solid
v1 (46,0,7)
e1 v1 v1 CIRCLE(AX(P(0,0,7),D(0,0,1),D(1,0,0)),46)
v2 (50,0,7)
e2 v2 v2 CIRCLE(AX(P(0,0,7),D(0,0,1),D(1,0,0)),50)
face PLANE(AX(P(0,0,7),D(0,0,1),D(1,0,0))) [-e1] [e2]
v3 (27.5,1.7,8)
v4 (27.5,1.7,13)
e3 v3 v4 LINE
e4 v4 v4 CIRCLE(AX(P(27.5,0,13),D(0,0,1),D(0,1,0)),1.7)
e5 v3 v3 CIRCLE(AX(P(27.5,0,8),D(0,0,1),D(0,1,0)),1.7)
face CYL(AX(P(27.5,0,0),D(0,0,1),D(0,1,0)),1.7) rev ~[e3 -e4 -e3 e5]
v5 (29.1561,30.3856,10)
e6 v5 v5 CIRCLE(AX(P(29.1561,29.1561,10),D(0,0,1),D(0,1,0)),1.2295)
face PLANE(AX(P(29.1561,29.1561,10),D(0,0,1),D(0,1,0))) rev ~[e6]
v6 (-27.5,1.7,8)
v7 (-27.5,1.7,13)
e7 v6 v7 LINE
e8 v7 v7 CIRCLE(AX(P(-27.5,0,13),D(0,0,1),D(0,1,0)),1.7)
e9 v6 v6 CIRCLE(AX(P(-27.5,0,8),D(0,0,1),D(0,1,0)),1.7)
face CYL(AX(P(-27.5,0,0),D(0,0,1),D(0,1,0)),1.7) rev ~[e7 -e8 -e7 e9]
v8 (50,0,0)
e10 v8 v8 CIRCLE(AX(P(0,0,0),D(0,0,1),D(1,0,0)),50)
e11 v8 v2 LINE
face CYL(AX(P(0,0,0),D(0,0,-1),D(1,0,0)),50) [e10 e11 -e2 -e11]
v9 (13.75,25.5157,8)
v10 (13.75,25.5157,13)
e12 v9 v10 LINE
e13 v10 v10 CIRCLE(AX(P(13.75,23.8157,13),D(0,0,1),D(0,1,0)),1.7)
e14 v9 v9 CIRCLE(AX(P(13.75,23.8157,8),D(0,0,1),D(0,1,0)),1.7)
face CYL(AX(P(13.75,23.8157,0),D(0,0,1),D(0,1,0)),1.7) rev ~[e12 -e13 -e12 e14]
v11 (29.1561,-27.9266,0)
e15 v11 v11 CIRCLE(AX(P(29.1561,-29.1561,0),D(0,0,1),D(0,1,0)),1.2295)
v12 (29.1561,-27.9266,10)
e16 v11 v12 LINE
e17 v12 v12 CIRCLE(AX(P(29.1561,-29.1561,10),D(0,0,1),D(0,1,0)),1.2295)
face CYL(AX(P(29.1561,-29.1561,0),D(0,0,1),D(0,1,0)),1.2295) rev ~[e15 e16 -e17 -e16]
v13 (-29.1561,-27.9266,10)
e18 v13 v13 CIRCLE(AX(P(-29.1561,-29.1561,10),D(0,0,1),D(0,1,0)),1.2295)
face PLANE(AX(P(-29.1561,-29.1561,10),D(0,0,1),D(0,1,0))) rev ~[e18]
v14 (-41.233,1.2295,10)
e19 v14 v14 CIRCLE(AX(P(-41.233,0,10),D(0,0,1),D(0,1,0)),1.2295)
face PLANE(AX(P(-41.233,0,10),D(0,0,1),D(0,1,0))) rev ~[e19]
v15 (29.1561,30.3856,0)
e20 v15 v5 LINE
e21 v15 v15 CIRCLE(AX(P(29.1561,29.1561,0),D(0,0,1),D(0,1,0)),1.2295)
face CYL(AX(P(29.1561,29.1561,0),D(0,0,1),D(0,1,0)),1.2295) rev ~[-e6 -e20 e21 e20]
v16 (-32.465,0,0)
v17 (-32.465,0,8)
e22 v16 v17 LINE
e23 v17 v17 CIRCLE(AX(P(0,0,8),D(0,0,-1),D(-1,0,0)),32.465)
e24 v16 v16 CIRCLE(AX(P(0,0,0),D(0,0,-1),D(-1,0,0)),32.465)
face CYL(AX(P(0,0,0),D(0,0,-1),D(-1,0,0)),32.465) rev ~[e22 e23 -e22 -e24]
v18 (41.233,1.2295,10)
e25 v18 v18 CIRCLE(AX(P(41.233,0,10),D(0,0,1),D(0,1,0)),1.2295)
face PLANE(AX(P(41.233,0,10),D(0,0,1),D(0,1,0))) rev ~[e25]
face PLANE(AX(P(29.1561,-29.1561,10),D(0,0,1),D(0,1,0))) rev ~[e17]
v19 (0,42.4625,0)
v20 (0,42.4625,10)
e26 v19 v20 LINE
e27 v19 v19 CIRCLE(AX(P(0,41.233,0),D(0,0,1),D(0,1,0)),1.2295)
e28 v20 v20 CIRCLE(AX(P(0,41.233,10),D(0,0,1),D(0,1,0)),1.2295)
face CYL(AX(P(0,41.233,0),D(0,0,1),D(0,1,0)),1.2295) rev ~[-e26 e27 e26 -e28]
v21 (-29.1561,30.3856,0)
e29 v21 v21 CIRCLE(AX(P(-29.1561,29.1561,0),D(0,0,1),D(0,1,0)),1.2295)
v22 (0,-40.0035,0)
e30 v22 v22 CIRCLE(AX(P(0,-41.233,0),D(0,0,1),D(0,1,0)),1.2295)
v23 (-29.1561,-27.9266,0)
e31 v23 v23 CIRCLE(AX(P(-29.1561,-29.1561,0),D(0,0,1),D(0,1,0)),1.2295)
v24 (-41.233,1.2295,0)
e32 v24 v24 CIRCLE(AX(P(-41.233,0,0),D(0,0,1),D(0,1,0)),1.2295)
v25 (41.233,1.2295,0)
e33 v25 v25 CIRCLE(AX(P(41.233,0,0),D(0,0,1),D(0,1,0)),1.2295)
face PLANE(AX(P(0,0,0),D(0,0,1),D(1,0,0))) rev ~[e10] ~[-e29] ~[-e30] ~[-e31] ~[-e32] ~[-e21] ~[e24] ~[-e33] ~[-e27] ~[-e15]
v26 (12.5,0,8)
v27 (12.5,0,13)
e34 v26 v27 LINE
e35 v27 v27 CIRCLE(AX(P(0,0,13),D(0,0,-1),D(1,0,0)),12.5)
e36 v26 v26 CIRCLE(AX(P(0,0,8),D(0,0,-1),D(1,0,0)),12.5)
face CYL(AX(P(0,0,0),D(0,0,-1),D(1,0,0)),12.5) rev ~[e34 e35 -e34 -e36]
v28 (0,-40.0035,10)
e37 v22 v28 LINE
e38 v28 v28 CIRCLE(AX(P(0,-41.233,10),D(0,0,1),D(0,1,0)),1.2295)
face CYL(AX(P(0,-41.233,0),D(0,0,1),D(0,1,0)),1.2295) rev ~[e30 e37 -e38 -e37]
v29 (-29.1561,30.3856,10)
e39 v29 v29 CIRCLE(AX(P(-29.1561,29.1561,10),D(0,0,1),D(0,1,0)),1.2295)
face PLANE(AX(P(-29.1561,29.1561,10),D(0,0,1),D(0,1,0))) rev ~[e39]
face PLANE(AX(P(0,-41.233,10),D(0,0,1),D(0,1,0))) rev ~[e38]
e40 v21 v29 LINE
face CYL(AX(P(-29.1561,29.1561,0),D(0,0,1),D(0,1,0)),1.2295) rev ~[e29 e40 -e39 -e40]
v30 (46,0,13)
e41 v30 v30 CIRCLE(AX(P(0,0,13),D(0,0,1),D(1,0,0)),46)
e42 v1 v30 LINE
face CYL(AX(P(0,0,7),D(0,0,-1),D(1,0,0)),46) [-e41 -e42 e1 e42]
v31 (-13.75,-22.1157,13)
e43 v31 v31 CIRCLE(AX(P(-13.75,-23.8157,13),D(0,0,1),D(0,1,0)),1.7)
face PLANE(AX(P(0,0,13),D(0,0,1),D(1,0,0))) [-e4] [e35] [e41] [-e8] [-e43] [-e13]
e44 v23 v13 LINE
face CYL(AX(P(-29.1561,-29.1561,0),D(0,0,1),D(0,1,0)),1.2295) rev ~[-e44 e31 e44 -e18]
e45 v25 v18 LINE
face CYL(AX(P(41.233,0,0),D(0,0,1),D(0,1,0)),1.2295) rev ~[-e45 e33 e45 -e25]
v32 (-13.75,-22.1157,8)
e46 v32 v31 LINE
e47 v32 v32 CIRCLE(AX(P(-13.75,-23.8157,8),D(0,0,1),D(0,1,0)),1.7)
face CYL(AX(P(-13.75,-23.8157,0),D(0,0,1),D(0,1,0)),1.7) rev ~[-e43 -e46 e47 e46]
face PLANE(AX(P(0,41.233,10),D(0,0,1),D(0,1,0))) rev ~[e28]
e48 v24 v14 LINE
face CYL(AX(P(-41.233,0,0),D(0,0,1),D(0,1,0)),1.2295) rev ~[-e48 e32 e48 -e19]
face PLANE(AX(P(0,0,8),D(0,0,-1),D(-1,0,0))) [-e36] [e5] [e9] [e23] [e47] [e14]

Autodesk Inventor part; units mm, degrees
ref_plane "YZ Plane" through (0, 0, 0) normal (1, 0, 0) x (0, 1, 0)
sketch "Sketch1" plane through (0, 0, 0) normal (0, 0, 1) x (1, 0, 0)
  circle A0 centre (0, 0) radius 50
  circle A1 centre (0, 0) radius 12.5
  circle A2 centre (0, 0) radius 14.5
  line L0 (-15.5, -15.5) -> (15.5, -15.5) construction
  line L1 (15.5, -15.5) -> (15.5, 15.5) construction
  line L2 (15.5, 15.5) -> (-15.5, 15.5) construction
  line L3 (-15.5, 15.5) -> (-15.5, -15.5) construction
  line L4 (-15.5, -15.5) -> (15.5, 15.5) construction
  line L5 (15.5, -15.5) -> (-15.5, 15.5) construction
  dimension "Diametro" = 100
  dimension "d1" = 25
  dimension "d2" = 2
  dimension "d8" = 31
extrude "Extrusion1" add sketch "Sketch1" along normal blind 7 contours A0 | A2
extrude "Extrusion2" add sketch "Sketch1" along normal blind 100 contours A2
ref_plane "Work Plane1" through (0, 0, 22) normal (0, 0, 1) x (1, 0, 0)
sketch "Sketch2" plane through (0, 0, 22) normal (0, 0, 1) x (1, 0, 0)
  arc A0 (2.5, 24.8747) -> (-2.5, 24.8747) centre (0, 0) ccw
  line L0 (2.5, 24.8747) -> (2.5, 14.2829)
  line L1 (-2.5, 24.8747) -> (-2.5, 14.2829)
  line L2 (0, -70) -> (0, 70) projected
  circle A1 centre (0, 0) radius 14.5 projected
  point P0 (0, 25)
  dimension "d24" = 5
  dimension "d25" = 25
  dimension "Dedos" = 5
extrude "Extrusion3" add sketch "Sketch2" along normal blind 15 contours L0 A1 L2 A0 | L2 A1 L1 A0
sketch "Sketch3" plane through (0, 0, 0) normal (1, 0, 0) x (0, 1, 0)
  line L0 (25, 37) -> (24.8747, 37) projected
  line L1 (14.2829, 22) -> (14.5, 22) projected
  line L2 (25, 22) -> (25, 37) projected
  line L3 (14.2829, 22) -> (14.2829, 37) projected
  circle A0 centre (25.74, 29.5) radius 1.5
  line L4 (0, -7.4) -> (0, 44.4) projected
  point P0 (0, 0)
  point P1 (25, 29.5)
  dimension "d31" = 3
  dimension "d92" = 25.74
fillet "Fillet2" radius 8 1 edges at (0, 25, 22)
pattern_circular "Circular Pattern1" count 4 over 360 about axis through (0, 0, 0) along (0, 0, 1) of "Fillet2", "Extrusion3"
ref_plane "Plano de trabajo2" through (0, 0, 54) normal (0, 0, 1) x (1, 0, 0)
sketch "Boceto4" plane through (0, 0, 54) normal (0, 0, 1) x (1, 0, 0)
  circle A0 centre (0, 0) radius 17.5
  circle A1 centre (0, 0) radius 14.5 projected
  line L0 (4, -23.75) -> (4, -26.75) projected
  dimension "d54" = 35
extrude "Extrusión5" add sketch "Boceto4" against normal up to surface (47 mm away)
sketch "Boceto5" plane through (0, 0, 37) normal (0, 0, 1) x (0, 1, 0)
  arc A0 (-2.5, -17.3205) -> (2.5, -17.3205) centre (0, 0) ccw projected
  line L0 (-2.5, -17.3205) -> (-2.5, -24.8747) projected
  arc A1 (-2.5, -24.8747) -> (2.5, -24.8747) centre (0, 0) ccw projected
  line L1 (2.5, -24.8747) -> (2.5, -17.3205) projected
  circle A2 centre (0, 0) radius 14.5 projected
  line L2 (2.5, -17.3205) -> (2.5, -14.2829)
  line L3 (-2.5, -17.3205) -> (-2.5, -14.2829)
extrude "Extrusión6" add sketch "Boceto5" along normal blind 20 contours L3 A2 L2 A0 | A0 L1 A1 L0
fillet "Empalme4" radius 8 1 edges at (25, 0, 57)
pattern_circular "Patrón circular2" count 4 over 360 about axis through (0, 0, 54) along (0, 0, -1) of "Extrusión6", "Empalme4"
chamfer "Chaflán1" distance 2 angle 45 1 edges at (-14.5, 0, 100)
sketch "Boceto6" plane through (0, 0, 7) normal (0, 0, 1) x (1, 0, 0)
  circle A0 centre (0, 0) radius 50 projected
  arc A1 (17.3205, 2.5) -> (2.5, 17.3205) centre (0, 0) ccw construction
  line L0 (0, 0) -> (32.476, 18.75) construction
  arc A2 (17.3205, 2.5) -> (2.5, 17.3205) centre (0, 0) ccw construction
  point P0 (16.25, -6.4952)
  point P1 (16.25, 6.4952)
  point P2 (0, 37.5)
  point P3 (-32.476, 18.75)
  point P4 (-32.476, -18.75)
  point P5 (0, -37.5)
  point P6 (32.476, -18.75)
  point P7 (10.8253, 13.75)
  point P8 (15.1554, 8.75)
  dimension "d73" = 360
  dimension "d91" = 37.5
sketch "Boceto8" plane through (0, 0, 7) normal (0, 0, 1) x (1, 0, 0)
  circle A0 centre (0, 0) radius 17.5 projected
  circle A1 centre (0, 0) radius 50 projected
  circle A2 centre (0, 0) radius 46
  dimension "Espesor" = 4
extrude "Extrusión8" add sketch "Boceto8" along normal blind 6 contours A2
sketch "Boceto9" plane through (2.5, 14.0104, 54) normal (1, 0, 0) x (0, -1, 0)
  line L0 (16.5104, 0) -> (28.2932, 0) projected
  line L1 (-35.9896, 54) -> (64.0104, 54) projected
  point P0 (1.4018, 24.5)
  point P1 (22.4018, 0)
  dimension "d124" = 21
  dimension "d125" = 29.5
hole "Agujero4" at (2.5, 12.6086, 29.5) direction (-1, 0, 0) diameter 3.4 depth 5 clearance for "Tornillo de cabeza plana avellanada ISO 2009/7046" size "M3" standard "ISO"
pattern_circular "Patrón circular3" count 4 over 360 about axis through (0, 0, 54) along (0, 0, -1) of "Agujero4"
sketch "Boceto13" plane through (0, 0, 13) normal (0, 0, 1) x (1, 0, 0)
  point P0 (0, 0)
sketch "Boceto15" plane through (0, 0, 0) normal (0, 0, -1) x (-1, 0, 0)
  circle A0 centre (0, 0) radius 27.5 construction
  point P0 (27.5, 0)
  point P1 (13.75, 23.8157)
  point P2 (-13.75, 23.8157)
  point P3 (-27.5, 0)
  point P4 (-13.75, -23.8157)
  point P5 (13.75, -23.8157)
  dimension "d134" = 55
  dimension "d137" = 360
hole "Agujero8" at (-13.75, -23.8157, 0) at (13.75, -23.8157, 0) at (27.5, 0, 0) at (13.75, 23.8157, 0) at (-13.75, 23.8157, 0) at (-27.5, 0, 0) direction (0, 0, 1) diameter 3.4 end through all clearance for "Tornillo de cabeza cilíndrica ranurada ISO 1207" size "M3" standard "ISO"
sketch "Boceto16" plane through (0, 0, 0) normal (0, 0, -1) x (-1, 0, 0)
  circle A0 centre (0, 0) radius 32.465
  dimension "d146" = 64.93
extrude "Extrusión10" cut sketch "Boceto16" against normal blind 8
sketch "Boceto18" plane through (0, 0, 0) normal (0, 0, -1) x (-1, 0, 0)
  point P0 (0, 0)
  point P1 (-41.233, 0)
  point P2 (-29.1561, -29.1561)
  point P3 (0, -41.233)
  point P4 (29.1561, -29.1561)
  point P5 (41.233, 0)
  point P6 (29.1561, 29.1561)
  point P7 (0, 41.233)
  point P8 (-29.1561, 29.1561)
  dimension "d162" = 41.233
  dimension "d165" = 360
hole "Agujero10" at (41.233, 0, 0) at (29.1561, -29.1561, 0) at (0, -41.233, 0) at (-29.1561, -29.1561, 0) at (-41.233, 0, 0) at (-29.1561, 29.1561, 0) at (0, 41.233, 0) at (29.1561, 29.1561, 0) direction (0, 0, 1) diameter 2.459 depth 10 thread size "M3x0.5" class "6H" standard "ISO Metric profile"
sketch "Sketch19" plane through (14.2829, -2.5, 54) normal (0, -1, 0) x (1, 0, 0)
  circle A0 centre (6.7167, -24.5) radius 1.7
  line L0 (3.0377, 0) -> (3.0377, -31.9844) projected
  line L1 (3.0377, 0) -> (-11.7829, 0) projected
  point P0 (-14.2829, -54)
  dimension "d174" = 3.4
  dimension "d175" = 3.679
  dimension "d176" = 24.5
hole "Hole11" at (20.9995, -2.5, 29.5) direction (0, 1, 0) diameter 4 depth 5
pattern_circular "Circular Pattern4" count 4 over 360 about axis through (0, 0, 0) along (0, 0, 1) of "Hole11"
sketch "Sketch20" plane through (0, 0, 13) normal (0, 0, 1) x (1, 0, 0)
  circle A0 centre (-27.5, 0) radius 1.7 projected
  circle A1 centre (-13.75, 23.8157) radius 1.7 projected
  circle A2 centre (13.75, 23.8157) radius 1.7 projected
  circle A3 centre (27.5, 0) radius 1.7 projected
  circle A4 centre (13.75, -23.8157) radius 1.7 projected
  circle A5 centre (-13.75, -23.8157) radius 1.7 projected
  circle A6 centre (0, 0) radius 46 projected
  circle A7 centre (0, 0) radius 17.5 projected
  circle A8 centre (0, 0) radius 46
extrude "Extrusion12" cut sketch "Sketch20" along normal up to surface contours A6 | A7
sketch "Sketch21" plane through (0, 0, 13) normal (0, 0, 1) x (1, 0, 0)
  circle A0 centre (0, 0) radius 12.5 projected
  circle A1 centre (-27.5, 0) radius 1.7 projected
  circle A2 centre (-13.75, 23.8157) radius 1.7 projected
  circle A3 centre (13.75, 23.8157) radius 1.7 projected
  circle A4 centre (27.5, 0) radius 1.7 projected
  circle A5 centre (13.75, -23.8157) radius 1.7 projected
  circle A6 centre (-13.75, -23.8157) radius 1.7 projected
  circle A7 centre (0, 0) radius 46 projected
  circle A8 centre (-13.75, 23.8157) radius 1.7
  circle A9 centre (13.75, -23.8157) radius 1.7
extrude "Extrusion13" add sketch "Sketch21" against normal up to surface (5 mm away) contours A2 | A5
equation "\"d24\" = Dedos"
equation "\"d91\" = 0.375 * Diametro"
properties part number "Soporte2" material "Aluminum 7075"
